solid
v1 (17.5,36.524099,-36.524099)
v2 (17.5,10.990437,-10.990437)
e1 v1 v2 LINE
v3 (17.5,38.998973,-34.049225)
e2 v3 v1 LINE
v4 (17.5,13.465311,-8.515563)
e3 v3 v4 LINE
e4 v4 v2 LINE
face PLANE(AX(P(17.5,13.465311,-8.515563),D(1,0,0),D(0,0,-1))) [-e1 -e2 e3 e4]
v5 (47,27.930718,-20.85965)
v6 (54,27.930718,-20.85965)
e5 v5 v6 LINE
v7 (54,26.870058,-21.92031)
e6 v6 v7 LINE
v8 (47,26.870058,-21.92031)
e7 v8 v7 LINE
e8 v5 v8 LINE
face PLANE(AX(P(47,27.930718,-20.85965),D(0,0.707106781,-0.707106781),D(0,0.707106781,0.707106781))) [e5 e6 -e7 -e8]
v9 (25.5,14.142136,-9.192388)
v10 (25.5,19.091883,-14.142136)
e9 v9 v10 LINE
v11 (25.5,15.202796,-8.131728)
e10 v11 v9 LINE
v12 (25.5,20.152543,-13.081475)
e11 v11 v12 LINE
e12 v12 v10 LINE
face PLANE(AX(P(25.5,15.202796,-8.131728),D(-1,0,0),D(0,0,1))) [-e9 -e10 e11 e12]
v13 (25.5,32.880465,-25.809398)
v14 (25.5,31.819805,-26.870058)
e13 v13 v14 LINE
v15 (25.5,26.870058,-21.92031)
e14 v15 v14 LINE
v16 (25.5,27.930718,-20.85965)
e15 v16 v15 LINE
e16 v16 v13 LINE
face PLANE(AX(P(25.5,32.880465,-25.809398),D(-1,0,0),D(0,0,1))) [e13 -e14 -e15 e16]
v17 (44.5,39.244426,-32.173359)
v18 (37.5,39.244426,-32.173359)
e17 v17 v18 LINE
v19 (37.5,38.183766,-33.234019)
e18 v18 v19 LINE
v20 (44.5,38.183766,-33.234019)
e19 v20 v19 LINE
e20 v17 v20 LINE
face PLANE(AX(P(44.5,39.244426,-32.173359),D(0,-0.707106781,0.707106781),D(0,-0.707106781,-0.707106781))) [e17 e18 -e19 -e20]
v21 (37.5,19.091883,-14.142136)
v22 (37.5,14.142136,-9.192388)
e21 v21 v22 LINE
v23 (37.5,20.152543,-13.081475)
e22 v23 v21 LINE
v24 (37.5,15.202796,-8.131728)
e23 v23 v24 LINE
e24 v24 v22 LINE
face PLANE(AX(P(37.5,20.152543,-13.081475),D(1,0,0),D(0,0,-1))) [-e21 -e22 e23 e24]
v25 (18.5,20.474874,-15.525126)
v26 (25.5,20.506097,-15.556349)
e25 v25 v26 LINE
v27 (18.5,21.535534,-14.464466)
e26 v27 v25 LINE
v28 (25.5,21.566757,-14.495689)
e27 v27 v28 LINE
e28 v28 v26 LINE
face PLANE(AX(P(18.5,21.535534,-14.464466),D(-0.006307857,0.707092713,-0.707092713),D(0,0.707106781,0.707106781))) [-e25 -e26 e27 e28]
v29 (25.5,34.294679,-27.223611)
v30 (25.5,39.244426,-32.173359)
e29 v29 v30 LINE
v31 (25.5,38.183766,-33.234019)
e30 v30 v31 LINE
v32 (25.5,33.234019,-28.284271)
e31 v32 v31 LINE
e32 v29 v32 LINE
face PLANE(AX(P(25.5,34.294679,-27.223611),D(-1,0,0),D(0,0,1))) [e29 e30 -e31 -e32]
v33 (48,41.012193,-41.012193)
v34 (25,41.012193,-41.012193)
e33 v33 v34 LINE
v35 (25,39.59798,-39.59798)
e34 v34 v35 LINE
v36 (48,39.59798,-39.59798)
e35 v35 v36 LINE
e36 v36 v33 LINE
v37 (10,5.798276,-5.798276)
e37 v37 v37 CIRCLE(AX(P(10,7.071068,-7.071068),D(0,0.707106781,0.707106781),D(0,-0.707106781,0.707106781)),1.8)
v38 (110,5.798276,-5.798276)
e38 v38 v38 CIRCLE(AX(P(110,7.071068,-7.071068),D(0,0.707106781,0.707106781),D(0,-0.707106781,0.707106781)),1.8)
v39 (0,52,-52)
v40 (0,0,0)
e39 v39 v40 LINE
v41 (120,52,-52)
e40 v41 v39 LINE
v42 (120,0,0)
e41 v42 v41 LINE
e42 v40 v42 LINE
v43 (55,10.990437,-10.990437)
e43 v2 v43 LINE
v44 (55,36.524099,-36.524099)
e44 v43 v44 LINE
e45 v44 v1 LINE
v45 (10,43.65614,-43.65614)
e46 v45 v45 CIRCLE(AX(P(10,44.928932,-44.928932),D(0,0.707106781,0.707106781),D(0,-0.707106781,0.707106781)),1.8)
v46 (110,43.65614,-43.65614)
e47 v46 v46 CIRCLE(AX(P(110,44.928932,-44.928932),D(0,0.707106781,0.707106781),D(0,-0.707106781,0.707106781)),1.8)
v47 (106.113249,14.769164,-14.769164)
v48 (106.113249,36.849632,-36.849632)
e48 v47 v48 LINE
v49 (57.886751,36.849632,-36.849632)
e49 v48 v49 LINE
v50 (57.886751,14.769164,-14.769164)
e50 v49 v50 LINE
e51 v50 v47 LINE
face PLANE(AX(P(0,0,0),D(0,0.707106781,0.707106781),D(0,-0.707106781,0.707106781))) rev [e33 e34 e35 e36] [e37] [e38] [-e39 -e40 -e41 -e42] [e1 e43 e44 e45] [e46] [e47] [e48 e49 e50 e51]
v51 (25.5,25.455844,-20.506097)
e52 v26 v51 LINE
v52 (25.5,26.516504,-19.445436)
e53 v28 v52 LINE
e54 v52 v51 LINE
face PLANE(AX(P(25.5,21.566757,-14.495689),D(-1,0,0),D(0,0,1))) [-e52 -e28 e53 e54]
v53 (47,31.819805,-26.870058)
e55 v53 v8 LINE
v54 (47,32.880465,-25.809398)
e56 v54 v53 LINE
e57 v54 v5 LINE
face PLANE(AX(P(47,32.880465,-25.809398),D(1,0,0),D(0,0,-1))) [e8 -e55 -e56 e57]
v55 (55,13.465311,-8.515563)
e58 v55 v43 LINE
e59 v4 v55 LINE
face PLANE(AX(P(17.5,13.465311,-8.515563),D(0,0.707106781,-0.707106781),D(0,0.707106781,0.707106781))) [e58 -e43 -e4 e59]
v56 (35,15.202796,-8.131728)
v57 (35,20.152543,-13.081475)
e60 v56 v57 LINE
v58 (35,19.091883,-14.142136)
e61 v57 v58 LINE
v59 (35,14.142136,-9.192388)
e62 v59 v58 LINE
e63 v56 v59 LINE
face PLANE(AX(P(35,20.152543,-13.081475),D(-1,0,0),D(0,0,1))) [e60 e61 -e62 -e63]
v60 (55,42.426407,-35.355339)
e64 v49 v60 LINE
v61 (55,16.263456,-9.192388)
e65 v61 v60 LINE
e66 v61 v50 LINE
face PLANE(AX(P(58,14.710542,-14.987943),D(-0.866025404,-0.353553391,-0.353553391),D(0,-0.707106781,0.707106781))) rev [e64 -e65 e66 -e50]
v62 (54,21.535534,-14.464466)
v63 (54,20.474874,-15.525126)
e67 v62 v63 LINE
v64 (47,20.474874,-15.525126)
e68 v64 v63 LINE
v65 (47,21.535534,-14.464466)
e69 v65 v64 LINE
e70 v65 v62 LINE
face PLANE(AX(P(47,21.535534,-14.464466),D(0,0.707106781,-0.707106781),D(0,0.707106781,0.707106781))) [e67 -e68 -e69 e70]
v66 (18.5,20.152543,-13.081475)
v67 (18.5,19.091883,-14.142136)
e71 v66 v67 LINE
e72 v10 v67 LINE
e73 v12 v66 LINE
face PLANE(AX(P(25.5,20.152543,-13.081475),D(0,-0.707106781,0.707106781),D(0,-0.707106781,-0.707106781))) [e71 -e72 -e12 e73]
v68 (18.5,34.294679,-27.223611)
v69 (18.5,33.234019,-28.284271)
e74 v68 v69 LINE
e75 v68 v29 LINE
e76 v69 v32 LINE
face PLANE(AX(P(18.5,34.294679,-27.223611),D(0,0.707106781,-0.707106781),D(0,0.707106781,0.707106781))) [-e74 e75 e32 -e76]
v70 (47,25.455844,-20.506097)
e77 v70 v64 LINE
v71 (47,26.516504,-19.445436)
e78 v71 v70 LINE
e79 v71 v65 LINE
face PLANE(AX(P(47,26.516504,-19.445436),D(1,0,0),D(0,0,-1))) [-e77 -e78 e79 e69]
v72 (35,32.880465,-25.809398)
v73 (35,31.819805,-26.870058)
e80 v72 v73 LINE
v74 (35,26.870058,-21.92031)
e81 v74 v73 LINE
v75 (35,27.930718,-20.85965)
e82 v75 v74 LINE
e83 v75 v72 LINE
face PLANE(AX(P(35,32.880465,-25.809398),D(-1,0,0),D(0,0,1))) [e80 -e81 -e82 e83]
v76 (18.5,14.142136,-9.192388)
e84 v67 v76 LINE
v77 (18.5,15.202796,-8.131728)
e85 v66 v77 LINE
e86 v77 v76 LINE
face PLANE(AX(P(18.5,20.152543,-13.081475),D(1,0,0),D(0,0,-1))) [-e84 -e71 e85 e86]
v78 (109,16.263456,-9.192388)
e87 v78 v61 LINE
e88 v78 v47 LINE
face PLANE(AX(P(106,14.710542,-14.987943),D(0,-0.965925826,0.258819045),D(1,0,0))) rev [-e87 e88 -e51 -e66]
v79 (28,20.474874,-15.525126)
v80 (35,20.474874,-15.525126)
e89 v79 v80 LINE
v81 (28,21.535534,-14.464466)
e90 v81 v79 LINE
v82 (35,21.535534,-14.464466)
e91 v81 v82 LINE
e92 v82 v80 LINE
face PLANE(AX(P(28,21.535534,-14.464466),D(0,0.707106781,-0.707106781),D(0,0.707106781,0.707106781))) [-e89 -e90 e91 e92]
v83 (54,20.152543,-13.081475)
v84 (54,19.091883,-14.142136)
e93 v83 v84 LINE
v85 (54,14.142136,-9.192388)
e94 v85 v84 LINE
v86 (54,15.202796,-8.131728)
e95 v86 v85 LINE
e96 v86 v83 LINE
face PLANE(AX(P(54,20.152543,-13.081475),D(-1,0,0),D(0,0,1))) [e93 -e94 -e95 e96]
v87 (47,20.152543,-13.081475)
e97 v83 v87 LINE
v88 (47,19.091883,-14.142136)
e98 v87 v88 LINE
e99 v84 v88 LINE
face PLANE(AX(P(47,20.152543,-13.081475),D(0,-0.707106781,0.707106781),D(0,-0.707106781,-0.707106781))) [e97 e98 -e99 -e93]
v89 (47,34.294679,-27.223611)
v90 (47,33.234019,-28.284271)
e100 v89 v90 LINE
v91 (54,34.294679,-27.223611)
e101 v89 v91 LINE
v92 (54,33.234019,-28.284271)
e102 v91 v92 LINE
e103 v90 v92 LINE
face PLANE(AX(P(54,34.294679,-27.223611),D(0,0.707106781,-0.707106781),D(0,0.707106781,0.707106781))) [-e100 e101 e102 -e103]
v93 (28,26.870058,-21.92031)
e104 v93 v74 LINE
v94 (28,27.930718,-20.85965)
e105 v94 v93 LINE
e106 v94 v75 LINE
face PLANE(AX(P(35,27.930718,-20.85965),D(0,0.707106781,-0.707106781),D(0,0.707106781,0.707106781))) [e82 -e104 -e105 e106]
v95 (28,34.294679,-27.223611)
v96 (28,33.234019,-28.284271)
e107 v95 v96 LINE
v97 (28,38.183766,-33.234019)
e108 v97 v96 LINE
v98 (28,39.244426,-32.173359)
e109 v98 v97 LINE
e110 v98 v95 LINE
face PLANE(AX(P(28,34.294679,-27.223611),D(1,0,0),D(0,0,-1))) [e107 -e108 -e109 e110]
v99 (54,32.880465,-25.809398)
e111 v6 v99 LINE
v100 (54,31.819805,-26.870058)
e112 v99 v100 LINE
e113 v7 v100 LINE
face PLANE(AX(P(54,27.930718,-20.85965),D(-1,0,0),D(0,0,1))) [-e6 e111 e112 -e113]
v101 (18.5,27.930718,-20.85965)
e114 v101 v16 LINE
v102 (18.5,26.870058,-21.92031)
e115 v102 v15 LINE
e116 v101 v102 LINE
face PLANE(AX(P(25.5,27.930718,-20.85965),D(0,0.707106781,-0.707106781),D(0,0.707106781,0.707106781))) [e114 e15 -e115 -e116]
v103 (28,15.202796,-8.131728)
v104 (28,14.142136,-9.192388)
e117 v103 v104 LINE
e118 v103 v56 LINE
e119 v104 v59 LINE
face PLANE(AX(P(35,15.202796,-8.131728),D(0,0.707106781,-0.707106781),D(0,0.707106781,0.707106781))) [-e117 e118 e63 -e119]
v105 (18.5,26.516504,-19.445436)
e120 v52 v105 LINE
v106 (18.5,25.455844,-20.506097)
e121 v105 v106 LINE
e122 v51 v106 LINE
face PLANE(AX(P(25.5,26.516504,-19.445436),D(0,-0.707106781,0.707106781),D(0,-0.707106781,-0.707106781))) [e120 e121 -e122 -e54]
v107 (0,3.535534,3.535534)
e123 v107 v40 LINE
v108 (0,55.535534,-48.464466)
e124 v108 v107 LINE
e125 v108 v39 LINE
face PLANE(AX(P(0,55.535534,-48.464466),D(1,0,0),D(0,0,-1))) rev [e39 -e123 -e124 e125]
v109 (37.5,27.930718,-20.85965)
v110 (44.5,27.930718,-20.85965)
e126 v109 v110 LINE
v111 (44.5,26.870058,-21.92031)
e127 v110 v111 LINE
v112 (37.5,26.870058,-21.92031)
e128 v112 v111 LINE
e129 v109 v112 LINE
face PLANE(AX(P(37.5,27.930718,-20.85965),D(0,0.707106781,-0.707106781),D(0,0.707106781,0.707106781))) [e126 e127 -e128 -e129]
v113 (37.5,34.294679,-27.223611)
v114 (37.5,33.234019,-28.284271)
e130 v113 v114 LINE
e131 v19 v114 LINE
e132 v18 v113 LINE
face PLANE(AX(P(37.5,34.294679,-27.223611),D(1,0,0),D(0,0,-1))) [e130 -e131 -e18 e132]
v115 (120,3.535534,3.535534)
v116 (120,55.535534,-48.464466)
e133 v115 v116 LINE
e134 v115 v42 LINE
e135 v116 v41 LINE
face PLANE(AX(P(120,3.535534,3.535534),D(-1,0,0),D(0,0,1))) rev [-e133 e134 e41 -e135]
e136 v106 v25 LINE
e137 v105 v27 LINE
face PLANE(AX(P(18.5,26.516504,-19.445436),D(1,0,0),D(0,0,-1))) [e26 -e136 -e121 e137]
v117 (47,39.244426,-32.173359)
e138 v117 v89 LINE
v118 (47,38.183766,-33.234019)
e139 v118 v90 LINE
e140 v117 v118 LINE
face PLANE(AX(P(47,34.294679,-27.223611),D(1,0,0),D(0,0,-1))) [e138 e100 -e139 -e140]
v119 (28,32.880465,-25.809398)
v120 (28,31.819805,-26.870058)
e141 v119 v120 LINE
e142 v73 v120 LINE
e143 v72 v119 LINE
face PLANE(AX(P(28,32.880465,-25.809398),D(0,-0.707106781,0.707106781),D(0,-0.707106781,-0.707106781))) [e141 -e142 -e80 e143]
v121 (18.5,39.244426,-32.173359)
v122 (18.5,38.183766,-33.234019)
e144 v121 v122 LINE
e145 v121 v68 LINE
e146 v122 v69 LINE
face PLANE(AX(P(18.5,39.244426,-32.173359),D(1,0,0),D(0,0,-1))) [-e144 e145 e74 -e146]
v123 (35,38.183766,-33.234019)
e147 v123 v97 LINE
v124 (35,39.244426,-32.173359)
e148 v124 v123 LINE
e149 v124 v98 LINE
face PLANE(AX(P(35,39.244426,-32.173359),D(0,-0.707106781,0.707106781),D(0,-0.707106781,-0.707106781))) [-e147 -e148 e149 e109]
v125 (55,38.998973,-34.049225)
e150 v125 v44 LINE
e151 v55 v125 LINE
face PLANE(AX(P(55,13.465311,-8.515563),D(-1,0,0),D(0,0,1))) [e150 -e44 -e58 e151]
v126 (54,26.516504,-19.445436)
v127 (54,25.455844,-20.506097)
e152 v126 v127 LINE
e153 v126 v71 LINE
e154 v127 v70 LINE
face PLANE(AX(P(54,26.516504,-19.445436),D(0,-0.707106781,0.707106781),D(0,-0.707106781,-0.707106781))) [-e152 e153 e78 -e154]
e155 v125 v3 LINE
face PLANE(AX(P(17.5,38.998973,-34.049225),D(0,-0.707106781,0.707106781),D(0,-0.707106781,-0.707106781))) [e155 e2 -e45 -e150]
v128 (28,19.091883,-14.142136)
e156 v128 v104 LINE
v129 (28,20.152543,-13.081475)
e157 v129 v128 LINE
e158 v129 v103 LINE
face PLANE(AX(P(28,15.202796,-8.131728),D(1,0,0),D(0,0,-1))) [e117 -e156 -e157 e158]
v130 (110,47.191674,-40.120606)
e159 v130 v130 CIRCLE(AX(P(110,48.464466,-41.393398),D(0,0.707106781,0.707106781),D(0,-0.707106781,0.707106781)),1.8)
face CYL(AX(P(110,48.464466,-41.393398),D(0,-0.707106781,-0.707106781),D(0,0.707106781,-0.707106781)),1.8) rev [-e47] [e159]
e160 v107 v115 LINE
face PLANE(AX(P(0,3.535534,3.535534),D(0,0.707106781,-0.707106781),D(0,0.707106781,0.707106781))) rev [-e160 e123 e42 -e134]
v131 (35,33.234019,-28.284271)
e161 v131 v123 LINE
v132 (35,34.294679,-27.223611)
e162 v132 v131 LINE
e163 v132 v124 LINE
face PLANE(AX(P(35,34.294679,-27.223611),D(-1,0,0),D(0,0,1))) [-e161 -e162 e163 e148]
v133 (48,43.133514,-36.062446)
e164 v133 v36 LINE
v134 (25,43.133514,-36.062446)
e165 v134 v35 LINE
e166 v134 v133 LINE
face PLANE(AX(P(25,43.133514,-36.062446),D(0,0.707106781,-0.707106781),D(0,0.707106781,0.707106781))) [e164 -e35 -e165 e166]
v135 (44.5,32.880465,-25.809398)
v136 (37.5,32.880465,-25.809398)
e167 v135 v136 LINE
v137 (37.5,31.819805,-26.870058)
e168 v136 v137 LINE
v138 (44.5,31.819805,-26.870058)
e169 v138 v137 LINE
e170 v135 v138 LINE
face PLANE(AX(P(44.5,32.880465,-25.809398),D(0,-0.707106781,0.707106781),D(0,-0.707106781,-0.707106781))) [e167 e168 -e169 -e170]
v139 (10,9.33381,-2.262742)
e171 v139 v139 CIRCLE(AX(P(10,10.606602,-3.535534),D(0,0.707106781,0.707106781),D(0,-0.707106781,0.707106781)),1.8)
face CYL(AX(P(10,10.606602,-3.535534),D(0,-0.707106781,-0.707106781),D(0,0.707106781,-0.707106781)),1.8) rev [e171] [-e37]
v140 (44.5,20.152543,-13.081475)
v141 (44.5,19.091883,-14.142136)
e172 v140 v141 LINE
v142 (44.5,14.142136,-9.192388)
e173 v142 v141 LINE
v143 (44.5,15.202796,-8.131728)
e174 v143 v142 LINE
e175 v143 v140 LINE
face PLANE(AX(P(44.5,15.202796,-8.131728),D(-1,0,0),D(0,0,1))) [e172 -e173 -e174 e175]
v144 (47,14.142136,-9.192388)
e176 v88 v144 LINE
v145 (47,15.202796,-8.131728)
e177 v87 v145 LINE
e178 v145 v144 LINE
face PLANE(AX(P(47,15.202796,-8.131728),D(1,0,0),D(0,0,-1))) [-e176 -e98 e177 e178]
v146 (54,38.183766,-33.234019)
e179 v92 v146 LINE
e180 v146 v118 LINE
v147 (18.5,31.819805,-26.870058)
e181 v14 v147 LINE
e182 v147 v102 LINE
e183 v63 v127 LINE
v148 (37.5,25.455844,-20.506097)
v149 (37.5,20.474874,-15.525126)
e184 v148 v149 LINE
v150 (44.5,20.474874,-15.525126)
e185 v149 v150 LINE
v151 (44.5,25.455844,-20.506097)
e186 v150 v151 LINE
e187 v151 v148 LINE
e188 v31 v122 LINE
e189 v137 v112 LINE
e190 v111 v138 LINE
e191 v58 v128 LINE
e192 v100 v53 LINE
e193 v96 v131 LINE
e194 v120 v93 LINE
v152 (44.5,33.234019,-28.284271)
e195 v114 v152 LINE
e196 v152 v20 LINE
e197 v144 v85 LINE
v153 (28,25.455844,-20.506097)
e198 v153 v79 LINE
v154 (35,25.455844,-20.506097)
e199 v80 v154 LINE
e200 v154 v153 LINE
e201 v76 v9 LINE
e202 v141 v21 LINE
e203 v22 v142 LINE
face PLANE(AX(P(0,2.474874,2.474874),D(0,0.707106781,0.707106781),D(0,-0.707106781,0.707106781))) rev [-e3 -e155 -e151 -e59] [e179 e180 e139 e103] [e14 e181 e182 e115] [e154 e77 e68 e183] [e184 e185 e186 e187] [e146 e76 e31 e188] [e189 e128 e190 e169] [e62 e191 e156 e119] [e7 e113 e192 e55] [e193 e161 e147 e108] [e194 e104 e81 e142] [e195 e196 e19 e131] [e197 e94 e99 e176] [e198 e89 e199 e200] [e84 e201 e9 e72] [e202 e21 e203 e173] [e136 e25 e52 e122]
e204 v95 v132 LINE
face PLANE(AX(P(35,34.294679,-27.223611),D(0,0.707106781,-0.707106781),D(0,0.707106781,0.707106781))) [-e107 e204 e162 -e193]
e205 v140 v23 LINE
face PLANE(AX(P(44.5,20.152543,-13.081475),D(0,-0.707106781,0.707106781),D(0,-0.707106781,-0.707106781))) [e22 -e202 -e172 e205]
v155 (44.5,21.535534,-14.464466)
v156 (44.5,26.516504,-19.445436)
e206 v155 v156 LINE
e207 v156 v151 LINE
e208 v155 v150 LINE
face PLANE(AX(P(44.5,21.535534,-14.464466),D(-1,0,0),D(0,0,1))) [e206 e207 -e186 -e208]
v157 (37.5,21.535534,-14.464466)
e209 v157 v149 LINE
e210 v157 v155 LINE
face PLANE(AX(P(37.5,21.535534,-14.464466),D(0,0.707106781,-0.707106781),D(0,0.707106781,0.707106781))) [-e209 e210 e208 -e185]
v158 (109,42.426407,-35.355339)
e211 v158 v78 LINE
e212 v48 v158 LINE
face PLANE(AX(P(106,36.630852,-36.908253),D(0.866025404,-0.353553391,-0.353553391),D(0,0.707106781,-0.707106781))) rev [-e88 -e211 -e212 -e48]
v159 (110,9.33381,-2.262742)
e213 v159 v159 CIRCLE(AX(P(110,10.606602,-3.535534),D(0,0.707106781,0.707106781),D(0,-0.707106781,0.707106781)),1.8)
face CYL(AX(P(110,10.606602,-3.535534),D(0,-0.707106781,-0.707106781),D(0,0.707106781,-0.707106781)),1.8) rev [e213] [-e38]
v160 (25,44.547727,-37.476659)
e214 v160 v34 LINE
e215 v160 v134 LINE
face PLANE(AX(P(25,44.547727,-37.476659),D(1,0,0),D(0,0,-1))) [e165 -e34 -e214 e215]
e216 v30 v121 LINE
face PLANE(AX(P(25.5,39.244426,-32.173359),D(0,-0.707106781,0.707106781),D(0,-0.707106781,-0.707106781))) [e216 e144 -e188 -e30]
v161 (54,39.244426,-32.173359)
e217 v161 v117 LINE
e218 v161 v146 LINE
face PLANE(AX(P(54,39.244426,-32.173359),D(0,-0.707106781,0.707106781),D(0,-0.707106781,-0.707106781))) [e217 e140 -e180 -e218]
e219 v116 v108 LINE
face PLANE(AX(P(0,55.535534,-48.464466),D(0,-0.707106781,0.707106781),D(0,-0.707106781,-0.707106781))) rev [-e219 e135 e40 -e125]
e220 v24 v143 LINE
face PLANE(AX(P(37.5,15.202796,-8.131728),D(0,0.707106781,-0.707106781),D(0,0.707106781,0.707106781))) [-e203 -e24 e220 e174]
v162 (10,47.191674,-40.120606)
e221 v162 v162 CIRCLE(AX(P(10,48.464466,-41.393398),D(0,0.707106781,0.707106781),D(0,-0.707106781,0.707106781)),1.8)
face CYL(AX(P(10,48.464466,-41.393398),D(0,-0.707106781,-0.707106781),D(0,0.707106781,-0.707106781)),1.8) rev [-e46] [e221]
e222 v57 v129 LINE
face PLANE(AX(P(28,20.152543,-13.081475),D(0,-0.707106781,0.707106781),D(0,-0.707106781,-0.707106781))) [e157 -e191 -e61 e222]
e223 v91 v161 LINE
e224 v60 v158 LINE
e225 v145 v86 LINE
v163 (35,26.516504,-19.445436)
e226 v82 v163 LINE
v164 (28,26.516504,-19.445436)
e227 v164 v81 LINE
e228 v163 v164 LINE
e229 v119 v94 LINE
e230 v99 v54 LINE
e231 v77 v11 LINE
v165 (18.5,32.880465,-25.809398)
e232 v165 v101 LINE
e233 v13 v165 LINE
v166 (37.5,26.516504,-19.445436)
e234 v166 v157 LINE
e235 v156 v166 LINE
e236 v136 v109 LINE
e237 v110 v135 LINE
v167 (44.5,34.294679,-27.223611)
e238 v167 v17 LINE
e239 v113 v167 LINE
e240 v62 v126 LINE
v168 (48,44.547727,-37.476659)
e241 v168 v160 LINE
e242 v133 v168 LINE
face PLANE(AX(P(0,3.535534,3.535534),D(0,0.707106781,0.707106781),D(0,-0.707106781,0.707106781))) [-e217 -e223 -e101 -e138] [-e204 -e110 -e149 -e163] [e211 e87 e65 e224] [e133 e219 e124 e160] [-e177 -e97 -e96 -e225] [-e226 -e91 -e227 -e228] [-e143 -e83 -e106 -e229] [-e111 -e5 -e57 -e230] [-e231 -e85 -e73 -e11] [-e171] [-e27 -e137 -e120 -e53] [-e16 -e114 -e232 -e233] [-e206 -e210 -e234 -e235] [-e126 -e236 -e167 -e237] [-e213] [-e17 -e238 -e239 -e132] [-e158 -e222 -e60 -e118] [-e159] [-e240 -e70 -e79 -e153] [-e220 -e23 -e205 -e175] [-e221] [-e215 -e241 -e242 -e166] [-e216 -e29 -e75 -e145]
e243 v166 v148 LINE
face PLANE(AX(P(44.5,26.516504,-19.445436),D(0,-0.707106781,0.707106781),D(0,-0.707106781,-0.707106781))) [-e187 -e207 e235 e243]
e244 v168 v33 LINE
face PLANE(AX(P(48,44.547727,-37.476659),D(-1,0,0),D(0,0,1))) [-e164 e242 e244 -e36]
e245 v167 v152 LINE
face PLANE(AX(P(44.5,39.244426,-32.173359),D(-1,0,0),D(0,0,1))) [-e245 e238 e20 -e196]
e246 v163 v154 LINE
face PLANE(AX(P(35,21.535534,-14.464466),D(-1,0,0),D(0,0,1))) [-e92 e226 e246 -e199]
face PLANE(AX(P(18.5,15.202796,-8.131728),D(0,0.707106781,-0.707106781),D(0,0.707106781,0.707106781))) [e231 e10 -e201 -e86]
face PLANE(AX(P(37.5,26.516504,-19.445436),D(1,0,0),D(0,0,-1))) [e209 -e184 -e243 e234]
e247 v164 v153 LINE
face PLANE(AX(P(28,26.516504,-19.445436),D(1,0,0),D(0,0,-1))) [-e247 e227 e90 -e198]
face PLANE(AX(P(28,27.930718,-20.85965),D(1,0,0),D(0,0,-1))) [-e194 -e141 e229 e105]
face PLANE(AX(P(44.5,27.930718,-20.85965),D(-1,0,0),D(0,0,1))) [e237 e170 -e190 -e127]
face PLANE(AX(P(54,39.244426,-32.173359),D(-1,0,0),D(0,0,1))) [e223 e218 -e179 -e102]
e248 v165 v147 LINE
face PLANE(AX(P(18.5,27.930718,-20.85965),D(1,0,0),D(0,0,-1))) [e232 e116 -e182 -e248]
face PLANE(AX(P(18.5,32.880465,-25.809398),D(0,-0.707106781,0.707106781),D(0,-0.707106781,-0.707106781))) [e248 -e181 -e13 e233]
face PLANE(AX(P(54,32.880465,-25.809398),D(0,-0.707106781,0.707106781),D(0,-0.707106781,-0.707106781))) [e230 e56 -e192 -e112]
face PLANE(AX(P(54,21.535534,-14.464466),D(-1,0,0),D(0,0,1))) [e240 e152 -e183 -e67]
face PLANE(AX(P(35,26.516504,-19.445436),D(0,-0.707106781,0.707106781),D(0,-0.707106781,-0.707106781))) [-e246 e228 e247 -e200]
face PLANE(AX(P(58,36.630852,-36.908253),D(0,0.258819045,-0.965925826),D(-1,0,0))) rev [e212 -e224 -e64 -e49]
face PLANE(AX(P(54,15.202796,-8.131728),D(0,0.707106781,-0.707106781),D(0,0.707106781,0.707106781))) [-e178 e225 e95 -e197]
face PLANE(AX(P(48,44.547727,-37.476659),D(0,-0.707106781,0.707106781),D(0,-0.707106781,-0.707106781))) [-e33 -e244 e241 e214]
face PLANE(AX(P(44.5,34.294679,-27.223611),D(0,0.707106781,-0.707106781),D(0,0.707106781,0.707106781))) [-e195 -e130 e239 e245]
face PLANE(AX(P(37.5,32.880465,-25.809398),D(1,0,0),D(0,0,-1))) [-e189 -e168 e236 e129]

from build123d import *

# Parameters (mm, degrees)
SKETCH_1_W          = 120
SKETCH_1_H          = 73.539105243
SKETCH_1_R          = 1.8
SKETCH_1_W_2        = 48
SKETCH_1_H_2        = 31
SKETCH_1_W_3        = 23
SKETCH_1_H_3        = 2
SKETCH_1_W_4        = 7
SKETCH_1_H_4        = 7
SKETCH_1_H_5        = 7.044155877
EXTRUDE_1_DEPTH     = 5
SKETCH_2_W          = 37.5
SKETCH_2_H          = 36.110051057
CUT_EXTRUDE_1_DEPTH = 3.5


with BuildPart() as part:
    # Эскиз1 → Бобышка-Вытянуть1 (new body)
    with BuildSketch(Plane(origin=(0, 0, 0), x_dir=(1, 0, 0), z_dir=(0, 0.7071067811865477, 0.7071067811865475))):
        with Locations((60, 36.769552622)):
            Rectangle(SKETCH_1_W, SKETCH_1_H)
        with Locations(Location((10, 63.539105243, 0), (0, 0, 270))):
            Circle(SKETCH_1_R, mode=Mode.SUBTRACT)
        with Locations(Location((110, 63.539105243, 0), (0, 0, 270))):
            Circle(SKETCH_1_R, mode=Mode.SUBTRACT)
        with Locations(Location((110, 10, 0), (0, 0, 270))):
            Circle(SKETCH_1_R, mode=Mode.SUBTRACT)
        with Locations(Location((10, 10, 0), (0, 0, 270))):
            Circle(SKETCH_1_R, mode=Mode.SUBTRACT)
        with Locations((82, 36.5)):
            Rectangle(SKETCH_1_W_2, SKETCH_1_H_2, mode=Mode.SUBTRACT)
        with Locations((36.5, 57)):
            Rectangle(SKETCH_1_W_3, SKETCH_1_H_3, mode=Mode.SUBTRACT)
        with Locations((50.5, 47)):
            Rectangle(SKETCH_1_W_4, SKETCH_1_H_4, mode=Mode.SUBTRACT)
        with Locations((41, 47)):
            Rectangle(SKETCH_1_W_4, SKETCH_1_H_4, mode=Mode.SUBTRACT)
        with Locations((31.5, 47)):
            Rectangle(SKETCH_1_W_4, SKETCH_1_H_4, mode=Mode.SUBTRACT)
        with Locations((22, 47)):
            Rectangle(SKETCH_1_W_4, SKETCH_1_H_4, mode=Mode.SUBTRACT)
        with Locations((22, 38)):
            Rectangle(SKETCH_1_W_4, SKETCH_1_H_4, mode=Mode.SUBTRACT)
        Polygon((18.5, 32.5), (18.5, 25.455844123), (25.5, 25.5), (25.5, 32.5), align=None, mode=Mode.SUBTRACT)
        with Locations((22, 20)):
            Rectangle(SKETCH_1_W_4, SKETCH_1_H_4, mode=Mode.SUBTRACT)
        with Locations((31.5, 20)):
            Rectangle(SKETCH_1_W_4, SKETCH_1_H_4, mode=Mode.SUBTRACT)
        with Locations((41, 20)):
            Rectangle(SKETCH_1_W_4, SKETCH_1_H_4, mode=Mode.SUBTRACT)
        with Locations((50.5, 20)):
            Rectangle(SKETCH_1_W_4, SKETCH_1_H_4, mode=Mode.SUBTRACT)
        with Locations((50.5, 28.977922062)):
            Rectangle(SKETCH_1_W_4, SKETCH_1_H_5, mode=Mode.SUBTRACT)
        with Locations((41, 38)):
            Rectangle(SKETCH_1_W_4, SKETCH_1_H_4, mode=Mode.SUBTRACT)
        with Locations((50.5, 38)):
            Rectangle(SKETCH_1_W_4, SKETCH_1_H_4, mode=Mode.SUBTRACT)
        with Locations((31.5, 38)):
            Rectangle(SKETCH_1_W_4, SKETCH_1_H_4, mode=Mode.SUBTRACT)
        with Locations((31.5, 28.977922062)):
            Rectangle(SKETCH_1_W_4, SKETCH_1_H_5, mode=Mode.SUBTRACT)
        with Locations((41, 28.977922062)):
            Rectangle(SKETCH_1_W_4, SKETCH_1_H_5, mode=Mode.SUBTRACT)
    extrude(amount=EXTRUDE_1_DEPTH)

    # Фаска1
    # the kernel refuses this chamfer: 5.196152423, 3 mm, written as the material it takes off along each edge
    with BuildSketch(Plane(origin=(58, 18.384776311, -11.313708499), x_dir=(0.01932676561270104, -0.706974708221925, -0.7069747082219248), z_dir=(0, 0.7071067811865475, -0.7071067811865477)), Plane(origin=(106, 40.305086528, -33.234018716), x_dir=(-0.019326765612701025, -0.706974708221925, -0.7069747082219249), z_dir=(0, -0.7071067811865475, 0.7071067811865477))) as chamfer_1_piece_1:
        with BuildLine():
            Line((5.377156765, 0), (-0.239955173, 3.099864482))
            Line((-0.239955173, 3.099864482), (-0.343858811, 3.097855985))
            ThreePointArc((-0.343858811, 3.097855985), (-0.133898034, 1.549663153), (-0.103903638, -0.002008496))
            Line((-0.103903638, -0.002008496), (0.002008496, -0.103903638))
            ThreePointArc((0.002008496, -0.103903638), (2.689582631, -0.051951819), (5.379165261, -0.103903638))
            Line((5.379165261, -0.103903638), (5.377156765, 0))
        make_face()
    extrude(amount=31, mode=Mode.SUBTRACT)
    with BuildSketch(Plane(origin=(106, 18.384776311, -11.313708499), x_dir=(0, -0.6933086211987814, -0.7206407952450685), z_dir=(-1, 0, 0)), Plane(origin=(58, 40.305086528, -33.234018716), x_dir=(0, -0.7206407952450687, -0.693308621198781), z_dir=(1, 0, 0))) as chamfer_1_piece_2:
        with BuildLine():
            Line((5.377156765, 0), (-0.239955173, 3.099864482))
            Line((-0.239955173, 3.099864482), (-0.343858811, 3.097855985))
            ThreePointArc((-0.343858811, 3.097855985), (-0.133898034, 1.549663153), (-0.103903638, -0.002008496))
            Line((-0.103903638, -0.002008496), (0.002008496, -0.103903638))
            ThreePointArc((0.002008496, -0.103903638), (2.689582631, -0.051951819), (5.379165261, -0.103903638))
            Line((5.379165261, -0.103903638), (5.377156765, 0))
        make_face()
    extrude(amount=48, mode=Mode.SUBTRACT)
    with BuildSketch(Plane(origin=(106, 18.384776311, -11.313708499), x_dir=(0, -0.6933086211987814, -0.7206407952450685), z_dir=(-1, 0, 0))) as chamfer_1_piece_3a_section:
        with BuildLine():
            Line((5.377156765, 0), (-0.239955173, 3.099864482))
            Line((-0.239955173, 3.099864482), (-0.343858811, 3.097855985))
            ThreePointArc((-0.343858811, 3.097855985), (-0.133898034, 1.549663153), (-0.103903638, -0.002008496))
            Line((-0.103903638, -0.002008496), (0.002008496, -0.103903638))
            ThreePointArc((0.002008496, -0.103903638), (2.689582631, -0.051951819), (5.379165261, -0.103903638))
            Line((5.379165261, -0.103903638), (5.377156765, 0))
        make_face()
    chamfer_1_piece_3a = extrude(amount=61.442891912, mode=Mode.PRIVATE)
    chamfer_1_piece_3a = split(chamfer_1_piece_3a, bisect_by=Plane(origin=(58, 16.472259587, -11.865738078), z_dir=(-1, 0, 0)), keep=Keep.TOP, mode=Mode.PRIVATE)
    with BuildSketch(Plane(origin=(58, 8.879216281, -1.808148469), x_dir=(0.01932676561270103, -0.706974708221925, -0.7069747082219248), z_dir=(0, 0.7071067811865475, -0.7071067811865477))) as chamfer_1_piece_3b_section:
        with BuildLine():
            Line((5.377156765, 0), (-0.239955173, 3.099864482))
            Line((-0.239955173, 3.099864482), (-0.343858811, 3.097855985))
            ThreePointArc((-0.343858811, 3.097855985), (-0.133898034, 1.549663153), (-0.103903638, -0.002008496))
            Line((-0.103903638, -0.002008496), (0.002008496, -0.103903638))
            ThreePointArc((0.002008496, -0.103903638), (2.689582631, -0.051951819), (5.379165261, -0.103903638))
            Line((5.379165261, -0.103903638), (5.377156765, 0))
        make_face()
    chamfer_1_piece_3b = extrude(amount=44.442891912, mode=Mode.PRIVATE)
    chamfer_1_piece_3b = split(chamfer_1_piece_3b, bisect_by=Plane(origin=(57.037990314, 17.15250316, -12.54598165), z_dir=(0, -0.7071067811865475, 0.7071067811865477)), keep=Keep.TOP, mode=Mode.PRIVATE)
    chamfer_1_piece_3 = chamfer_1_piece_3a & chamfer_1_piece_3b
    add(chamfer_1_piece_3, mode=Mode.SUBTRACT)
    with BuildSketch(Plane(origin=(44.557108088, 40.305086528, -33.234018716), x_dir=(0, -0.7206407952450687, -0.693308621198781), z_dir=(1, 0, 0))) as chamfer_1_piece_4a_section:
        with BuildLine():
            Line((5.377156765, 0), (-0.239955173, 3.099864482))
            Line((-0.239955173, 3.099864482), (-0.343858811, 3.097855985))
            ThreePointArc((-0.343858811, 3.097855985), (-0.133898034, 1.549663153), (-0.103903638, -0.002008496))
            Line((-0.103903638, -0.002008496), (0.002008496, -0.103903638))
            ThreePointArc((0.002008496, -0.103903638), (2.689582631, -0.051951819), (5.379165261, -0.103903638))
            Line((5.379165261, -0.103903638), (5.377156765, 0))
        make_face()
    chamfer_1_piece_4a = extrude(amount=61.442891912, mode=Mode.PRIVATE)
    chamfer_1_piece_4a = split(chamfer_1_piece_4a, bisect_by=Plane(origin=(58, 39.753056949, -35.146535439), z_dir=(-1, 0, 0)), keep=Keep.TOP, mode=Mode.PRIVATE)
    with BuildSketch(Plane(origin=(58, 18.384776311, -11.313708499), x_dir=(0.01932676561270104, -0.706974708221925, -0.7069747082219248), z_dir=(0, 0.7071067811865475, -0.7071067811865477))) as chamfer_1_piece_4b_section:
        with BuildLine():
            Line((5.377156765, 0), (-0.239955173, 3.099864482))
            Line((-0.239955173, 3.099864482), (-0.343858811, 3.097855985))
            ThreePointArc((-0.343858811, 3.097855985), (-0.133898034, 1.549663153), (-0.103903638, -0.002008496))
            Line((-0.103903638, -0.002008496), (0.002008496, -0.103903638))
            ThreePointArc((0.002008496, -0.103903638), (2.689582631, -0.051951819), (5.379165261, -0.103903638))
            Line((5.379165261, -0.103903638), (5.377156765, 0))
        make_face()
    chamfer_1_piece_4b = extrude(amount=44.442891912, mode=Mode.PRIVATE)
    chamfer_1_piece_4b = split(chamfer_1_piece_4b, bisect_by=Plane(origin=(57.037990314, 39.072813376, -34.466291867), z_dir=(0, 0.7071067811865475, -0.7071067811865477)), keep=Keep.TOP, mode=Mode.PRIVATE)
    chamfer_1_piece_4 = chamfer_1_piece_4a & chamfer_1_piece_4b
    add(chamfer_1_piece_4, mode=Mode.SUBTRACT)
    with BuildSketch(Plane(origin=(106, 40.305086528, -33.234018716), x_dir=(-0.019326765612701025, -0.706974708221925, -0.7069747082219249), z_dir=(0, -0.7071067811865475, 0.7071067811865477))) as chamfer_1_piece_5a_section:
        with BuildLine():
            Line((5.377156765, 0), (-0.239955173, 3.099864482))
            Line((-0.239955173, 3.099864482), (-0.343858811, 3.097855985))
            ThreePointArc((-0.343858811, 3.097855985), (-0.133898034, 1.549663153), (-0.103903638, -0.002008496))
            Line((-0.103903638, -0.002008496), (0.002008496, -0.103903638))
            ThreePointArc((0.002008496, -0.103903638), (2.689582631, -0.051951819), (5.379165261, -0.103903638))
            Line((5.379165261, -0.103903638), (5.377156765, 0))
        make_face()
    chamfer_1_piece_5a = extrude(amount=44.442891912, mode=Mode.PRIVATE)
    chamfer_1_piece_5a = split(chamfer_1_piece_5a, bisect_by=Plane(origin=(106.962009686, 17.15250316, -12.54598165), z_dir=(0, -0.7071067811865475, 0.7071067811865477)), keep=Keep.TOP, mode=Mode.PRIVATE)
    with BuildSketch(Plane(origin=(119.442891912, 18.384776311, -11.313708499), x_dir=(0, -0.6933086211987812, -0.7206407952450685), z_dir=(-1, 0, 0))) as chamfer_1_piece_5b_section:
        with BuildLine():
            Line((5.377156765, 0), (-0.239955173, 3.099864482))
            Line((-0.239955173, 3.099864482), (-0.343858811, 3.097855985))
            ThreePointArc((-0.343858811, 3.097855985), (-0.133898034, 1.549663153), (-0.103903638, -0.002008496))
            Line((-0.103903638, -0.002008496), (0.002008496, -0.103903638))
            ThreePointArc((0.002008496, -0.103903638), (2.689582631, -0.051951819), (5.379165261, -0.103903638))
            Line((5.379165261, -0.103903638), (5.377156765, 0))
        make_face()
    chamfer_1_piece_5b = extrude(amount=61.442891912, mode=Mode.PRIVATE)
    chamfer_1_piece_5b = split(chamfer_1_piece_5b, bisect_by=Plane(origin=(106, 16.472259587, -11.865738078), z_dir=(1, 0, 0)), keep=Keep.TOP, mode=Mode.PRIVATE)
    chamfer_1_piece_5 = chamfer_1_piece_5a & chamfer_1_piece_5b
    add(chamfer_1_piece_5, mode=Mode.SUBTRACT)
    with BuildSketch(Plane(origin=(58, 40.305086528, -33.234018716), x_dir=(0, -0.7206407952450687, -0.693308621198781), z_dir=(1, 0, 0))) as chamfer_1_piece_6a_section:
        with BuildLine():
            Line((5.377156765, 0), (-0.239955173, 3.099864482))
            Line((-0.239955173, 3.099864482), (-0.343858811, 3.097855985))
            ThreePointArc((-0.343858811, 3.097855985), (-0.133898034, 1.549663153), (-0.103903638, -0.002008496))
            Line((-0.103903638, -0.002008496), (0.002008496, -0.103903638))
            ThreePointArc((0.002008496, -0.103903638), (2.689582631, -0.051951819), (5.379165261, -0.103903638))
            Line((5.379165261, -0.103903638), (5.377156765, 0))
        make_face()
    chamfer_1_piece_6a = extrude(amount=61.442891912, mode=Mode.PRIVATE)
    chamfer_1_piece_6a = split(chamfer_1_piece_6a, bisect_by=Plane(origin=(106, 39.753056949, -35.146535439), z_dir=(1, 0, 0)), keep=Keep.TOP, mode=Mode.PRIVATE)
    with BuildSketch(Plane(origin=(106, 49.810646557, -42.739578745), x_dir=(-0.019326765612701025, -0.706974708221925, -0.7069747082219249), z_dir=(0, -0.7071067811865475, 0.7071067811865477))) as chamfer_1_piece_6b_section:
        with BuildLine():
            Line((5.377156765, 0), (-0.239955173, 3.099864482))
            Line((-0.239955173, 3.099864482), (-0.343858811, 3.097855985))
            ThreePointArc((-0.343858811, 3.097855985), (-0.133898034, 1.549663153), (-0.103903638, -0.002008496))
            Line((-0.103903638, -0.002008496), (0.002008496, -0.103903638))
            ThreePointArc((0.002008496, -0.103903638), (2.689582631, -0.051951819), (5.379165261, -0.103903638))
            Line((5.379165261, -0.103903638), (5.377156765, 0))
        make_face()
    chamfer_1_piece_6b = extrude(amount=44.442891912, mode=Mode.PRIVATE)
    chamfer_1_piece_6b = split(chamfer_1_piece_6b, bisect_by=Plane(origin=(106.962009686, 39.072813376, -34.466291867), z_dir=(0, 0.7071067811865475, -0.7071067811865477)), keep=Keep.TOP, mode=Mode.PRIVATE)
    chamfer_1_piece_6 = chamfer_1_piece_6a & chamfer_1_piece_6b
    add(chamfer_1_piece_6, mode=Mode.SUBTRACT)

    # Эскиз2 → Вырез-Вытянуть1 (cut)
    with BuildSketch(Plane(origin=(0, 0, 0), x_dir=(1, 0, 0), z_dir=(0, 0.7071067811865477, 0.7071067811865475))):
        with Locations((36.25, 33.597850417)):
            Rectangle(SKETCH_2_W, SKETCH_2_H)
    extrude(amount=CUT_EXTRUDE_1_DEPTH, mode=Mode.SUBTRACT)


solid = part.part
